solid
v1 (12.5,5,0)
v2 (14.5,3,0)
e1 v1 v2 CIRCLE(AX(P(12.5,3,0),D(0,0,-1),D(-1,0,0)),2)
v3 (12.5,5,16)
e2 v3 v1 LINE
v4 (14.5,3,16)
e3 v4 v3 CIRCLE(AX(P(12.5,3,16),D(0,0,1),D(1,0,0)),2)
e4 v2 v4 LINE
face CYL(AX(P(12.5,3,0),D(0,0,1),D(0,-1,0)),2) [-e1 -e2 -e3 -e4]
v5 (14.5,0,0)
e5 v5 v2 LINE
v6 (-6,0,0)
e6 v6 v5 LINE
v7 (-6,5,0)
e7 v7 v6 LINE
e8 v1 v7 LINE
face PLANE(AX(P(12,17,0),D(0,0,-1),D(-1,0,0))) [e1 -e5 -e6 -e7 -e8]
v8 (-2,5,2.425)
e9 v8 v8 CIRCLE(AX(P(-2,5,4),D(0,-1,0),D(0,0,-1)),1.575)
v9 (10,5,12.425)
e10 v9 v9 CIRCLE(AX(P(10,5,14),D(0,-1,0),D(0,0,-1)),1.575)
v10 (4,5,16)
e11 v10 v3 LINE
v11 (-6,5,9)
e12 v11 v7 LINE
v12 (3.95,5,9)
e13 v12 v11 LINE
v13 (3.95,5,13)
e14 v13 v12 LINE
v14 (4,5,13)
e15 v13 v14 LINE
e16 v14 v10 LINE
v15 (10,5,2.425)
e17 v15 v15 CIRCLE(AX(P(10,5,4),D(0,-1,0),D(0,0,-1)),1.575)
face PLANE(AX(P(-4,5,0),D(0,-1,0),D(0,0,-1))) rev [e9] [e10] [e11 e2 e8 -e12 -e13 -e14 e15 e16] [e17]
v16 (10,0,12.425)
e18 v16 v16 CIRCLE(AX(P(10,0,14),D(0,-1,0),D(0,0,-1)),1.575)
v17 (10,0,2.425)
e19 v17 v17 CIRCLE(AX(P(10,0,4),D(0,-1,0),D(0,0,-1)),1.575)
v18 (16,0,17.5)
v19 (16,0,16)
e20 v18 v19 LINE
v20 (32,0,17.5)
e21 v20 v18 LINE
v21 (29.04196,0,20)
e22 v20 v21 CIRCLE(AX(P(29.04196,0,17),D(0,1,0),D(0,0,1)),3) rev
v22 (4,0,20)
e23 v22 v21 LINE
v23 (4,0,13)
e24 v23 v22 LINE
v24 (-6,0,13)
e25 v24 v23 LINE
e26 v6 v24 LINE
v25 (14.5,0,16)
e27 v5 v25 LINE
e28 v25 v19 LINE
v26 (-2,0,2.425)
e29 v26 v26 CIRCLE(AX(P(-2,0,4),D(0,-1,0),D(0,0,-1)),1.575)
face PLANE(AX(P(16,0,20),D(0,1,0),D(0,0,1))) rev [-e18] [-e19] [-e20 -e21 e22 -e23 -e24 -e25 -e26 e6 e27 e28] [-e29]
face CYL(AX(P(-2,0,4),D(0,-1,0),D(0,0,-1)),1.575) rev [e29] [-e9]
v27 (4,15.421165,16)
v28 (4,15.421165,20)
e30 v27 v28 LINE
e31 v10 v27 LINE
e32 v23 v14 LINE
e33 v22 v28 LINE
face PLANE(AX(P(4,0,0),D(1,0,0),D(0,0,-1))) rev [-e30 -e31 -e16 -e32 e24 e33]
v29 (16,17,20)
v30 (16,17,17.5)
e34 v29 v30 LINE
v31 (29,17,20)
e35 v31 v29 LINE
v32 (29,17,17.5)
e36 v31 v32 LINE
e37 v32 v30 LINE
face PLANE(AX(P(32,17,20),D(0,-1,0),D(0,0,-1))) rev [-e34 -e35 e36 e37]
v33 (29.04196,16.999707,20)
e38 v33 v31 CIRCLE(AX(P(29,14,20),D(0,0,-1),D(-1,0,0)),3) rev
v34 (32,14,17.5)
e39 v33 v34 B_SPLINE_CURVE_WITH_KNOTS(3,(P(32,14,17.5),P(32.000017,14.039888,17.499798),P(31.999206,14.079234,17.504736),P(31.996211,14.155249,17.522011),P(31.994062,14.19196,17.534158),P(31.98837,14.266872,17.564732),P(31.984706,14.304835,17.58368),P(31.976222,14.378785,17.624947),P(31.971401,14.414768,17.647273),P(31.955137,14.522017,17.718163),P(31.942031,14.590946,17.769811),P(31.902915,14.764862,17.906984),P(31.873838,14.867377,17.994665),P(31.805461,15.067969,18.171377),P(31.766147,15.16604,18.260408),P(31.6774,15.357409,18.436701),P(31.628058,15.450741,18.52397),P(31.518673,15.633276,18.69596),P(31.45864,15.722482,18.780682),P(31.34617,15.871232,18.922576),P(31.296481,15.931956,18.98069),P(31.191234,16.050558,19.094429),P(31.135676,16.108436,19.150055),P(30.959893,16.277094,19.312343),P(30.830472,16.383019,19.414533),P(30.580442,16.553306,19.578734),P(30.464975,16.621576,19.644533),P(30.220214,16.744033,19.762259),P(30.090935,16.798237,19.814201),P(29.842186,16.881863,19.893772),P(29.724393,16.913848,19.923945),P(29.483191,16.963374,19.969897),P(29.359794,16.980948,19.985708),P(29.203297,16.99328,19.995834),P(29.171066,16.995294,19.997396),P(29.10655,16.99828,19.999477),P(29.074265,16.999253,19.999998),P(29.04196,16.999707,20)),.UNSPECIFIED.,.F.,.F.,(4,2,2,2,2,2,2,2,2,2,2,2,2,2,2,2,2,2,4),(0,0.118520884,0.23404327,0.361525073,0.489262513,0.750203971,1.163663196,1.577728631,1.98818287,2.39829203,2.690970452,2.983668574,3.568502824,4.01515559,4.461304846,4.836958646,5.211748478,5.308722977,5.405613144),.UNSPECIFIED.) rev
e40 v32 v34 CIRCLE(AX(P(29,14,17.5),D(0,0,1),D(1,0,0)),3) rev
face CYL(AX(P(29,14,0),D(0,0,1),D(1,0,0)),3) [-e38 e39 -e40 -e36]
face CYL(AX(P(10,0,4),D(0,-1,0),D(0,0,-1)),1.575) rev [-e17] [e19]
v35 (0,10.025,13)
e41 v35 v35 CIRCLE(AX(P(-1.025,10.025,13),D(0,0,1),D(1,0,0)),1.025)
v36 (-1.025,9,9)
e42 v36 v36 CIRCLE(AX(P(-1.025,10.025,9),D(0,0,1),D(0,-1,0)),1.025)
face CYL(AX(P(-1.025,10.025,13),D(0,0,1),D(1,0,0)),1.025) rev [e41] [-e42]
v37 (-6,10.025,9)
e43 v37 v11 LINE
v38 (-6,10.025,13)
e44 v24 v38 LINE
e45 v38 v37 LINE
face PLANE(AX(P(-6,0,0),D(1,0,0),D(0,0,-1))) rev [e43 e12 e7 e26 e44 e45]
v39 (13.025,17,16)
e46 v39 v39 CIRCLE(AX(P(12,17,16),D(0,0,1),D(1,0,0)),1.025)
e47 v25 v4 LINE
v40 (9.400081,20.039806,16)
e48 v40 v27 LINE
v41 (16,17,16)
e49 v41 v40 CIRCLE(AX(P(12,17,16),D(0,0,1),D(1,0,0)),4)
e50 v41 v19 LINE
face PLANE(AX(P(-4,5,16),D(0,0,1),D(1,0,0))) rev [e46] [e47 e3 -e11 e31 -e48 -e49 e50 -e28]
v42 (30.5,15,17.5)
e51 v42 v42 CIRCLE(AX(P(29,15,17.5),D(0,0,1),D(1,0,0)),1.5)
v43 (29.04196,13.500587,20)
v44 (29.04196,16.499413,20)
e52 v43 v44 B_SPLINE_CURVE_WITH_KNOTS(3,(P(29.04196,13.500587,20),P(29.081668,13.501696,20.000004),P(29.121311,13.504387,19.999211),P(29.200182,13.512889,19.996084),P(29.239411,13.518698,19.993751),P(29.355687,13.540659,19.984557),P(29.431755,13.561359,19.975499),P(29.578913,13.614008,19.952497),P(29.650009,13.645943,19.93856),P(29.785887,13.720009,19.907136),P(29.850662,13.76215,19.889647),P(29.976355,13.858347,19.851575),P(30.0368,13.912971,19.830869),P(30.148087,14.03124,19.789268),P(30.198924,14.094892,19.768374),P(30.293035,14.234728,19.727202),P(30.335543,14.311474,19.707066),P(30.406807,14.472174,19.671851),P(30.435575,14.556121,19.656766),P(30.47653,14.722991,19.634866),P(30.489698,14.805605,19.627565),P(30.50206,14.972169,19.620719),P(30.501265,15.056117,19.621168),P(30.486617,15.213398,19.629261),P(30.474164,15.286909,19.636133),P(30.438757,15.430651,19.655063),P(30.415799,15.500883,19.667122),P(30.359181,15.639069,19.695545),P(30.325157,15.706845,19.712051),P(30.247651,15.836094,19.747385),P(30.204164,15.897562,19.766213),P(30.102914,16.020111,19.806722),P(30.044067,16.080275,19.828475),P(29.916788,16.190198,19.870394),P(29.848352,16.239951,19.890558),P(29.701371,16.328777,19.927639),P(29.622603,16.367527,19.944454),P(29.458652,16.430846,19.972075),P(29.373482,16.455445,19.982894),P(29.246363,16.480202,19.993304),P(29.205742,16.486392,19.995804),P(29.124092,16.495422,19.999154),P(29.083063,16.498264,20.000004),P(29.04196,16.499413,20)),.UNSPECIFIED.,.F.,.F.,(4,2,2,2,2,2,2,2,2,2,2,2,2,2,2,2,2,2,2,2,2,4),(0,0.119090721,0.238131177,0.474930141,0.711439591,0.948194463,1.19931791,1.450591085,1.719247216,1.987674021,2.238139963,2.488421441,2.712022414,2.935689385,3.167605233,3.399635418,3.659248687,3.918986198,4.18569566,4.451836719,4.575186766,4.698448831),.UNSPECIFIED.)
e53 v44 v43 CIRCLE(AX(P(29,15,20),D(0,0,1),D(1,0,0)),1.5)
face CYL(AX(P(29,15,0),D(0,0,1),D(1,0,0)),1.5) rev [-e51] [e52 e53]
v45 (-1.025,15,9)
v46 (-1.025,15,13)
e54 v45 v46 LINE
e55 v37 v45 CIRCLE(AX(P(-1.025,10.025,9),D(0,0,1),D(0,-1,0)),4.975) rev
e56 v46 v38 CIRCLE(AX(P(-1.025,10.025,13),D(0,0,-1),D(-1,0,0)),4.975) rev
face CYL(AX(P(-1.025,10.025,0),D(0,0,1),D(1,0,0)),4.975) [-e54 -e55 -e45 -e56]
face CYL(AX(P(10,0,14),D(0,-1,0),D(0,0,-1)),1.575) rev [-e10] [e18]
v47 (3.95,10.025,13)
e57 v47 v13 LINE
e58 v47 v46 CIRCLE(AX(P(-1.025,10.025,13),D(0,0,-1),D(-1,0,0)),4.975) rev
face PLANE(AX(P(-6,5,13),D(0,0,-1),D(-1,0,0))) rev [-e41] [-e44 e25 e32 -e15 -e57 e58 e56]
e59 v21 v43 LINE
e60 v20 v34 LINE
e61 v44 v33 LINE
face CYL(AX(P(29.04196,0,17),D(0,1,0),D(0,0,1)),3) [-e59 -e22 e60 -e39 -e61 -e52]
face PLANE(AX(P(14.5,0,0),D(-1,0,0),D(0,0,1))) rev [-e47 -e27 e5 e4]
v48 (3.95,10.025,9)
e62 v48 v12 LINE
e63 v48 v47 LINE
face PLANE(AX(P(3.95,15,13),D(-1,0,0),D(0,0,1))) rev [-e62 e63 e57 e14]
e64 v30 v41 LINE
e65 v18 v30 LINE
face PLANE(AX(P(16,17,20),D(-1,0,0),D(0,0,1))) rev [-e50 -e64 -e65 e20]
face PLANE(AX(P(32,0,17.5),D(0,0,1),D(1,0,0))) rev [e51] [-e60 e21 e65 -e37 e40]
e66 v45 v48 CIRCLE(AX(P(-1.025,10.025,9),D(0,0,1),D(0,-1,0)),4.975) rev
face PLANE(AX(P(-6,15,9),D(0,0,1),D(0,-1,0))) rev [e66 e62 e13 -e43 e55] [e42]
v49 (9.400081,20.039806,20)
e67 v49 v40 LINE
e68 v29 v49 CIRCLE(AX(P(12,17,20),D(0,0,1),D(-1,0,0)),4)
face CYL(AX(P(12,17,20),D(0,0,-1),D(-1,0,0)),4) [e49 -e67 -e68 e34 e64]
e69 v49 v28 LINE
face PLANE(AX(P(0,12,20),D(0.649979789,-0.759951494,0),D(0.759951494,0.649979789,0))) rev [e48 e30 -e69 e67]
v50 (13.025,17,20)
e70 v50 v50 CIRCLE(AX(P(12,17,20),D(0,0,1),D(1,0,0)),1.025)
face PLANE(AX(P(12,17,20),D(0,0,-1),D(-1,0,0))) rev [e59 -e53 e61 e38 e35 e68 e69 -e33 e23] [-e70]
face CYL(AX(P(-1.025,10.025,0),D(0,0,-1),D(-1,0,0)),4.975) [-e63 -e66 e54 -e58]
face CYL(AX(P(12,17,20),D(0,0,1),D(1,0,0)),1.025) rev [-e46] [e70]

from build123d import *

# Parameters (mm, degrees)
RESSALTO_EXTRUS_O1_DEPTH                  = 20
CORTE_EXTRUS_O1_DEPTH                     = 20
CORTE_EXTRUS_O2_DEPTH                     = 34.12099032335839
RESSALTO_EXTRUS_O2_DEPTH                  = 10
FURO_ROSCADO_PARA_CONDU_TE_DE_M3X0_51_D   = 3.15
ESBO_O20_W                                = 9.95
ESBO_O20_H                                = 4.000000000000002
RESSALTO_EXTRUS_O6_DEPTH                  = 10
FILETE3_R                                 = 4.975
BROCA_DE_ROSQUEAR_PARA_TARRAXA_DE_M2_54_D = 2.05
CORTE_EXTRUS_O3_DEPTH                     = 31.199337741083
FILETE5_R                                 = 2
BROCA_DE_ROSQUEAR_PARA_TARRAXA_DE_M2_55_D = 2.05
ESBO_O30_W                                = 2.5
ESBO_O30_H                                = 17
RESSALTO_EXTRUS_O9_DEPTH                  = 16
FILETE12_R                                = 3
ESBO_O31_R                                = 1.5000000000000009
CORTE_EXTRUS_O4_DEPTH                     = 44.18564583747706


# Some blends are built 0.0001 mm under size
with BuildPart() as part:
    # Esboço1 → Ressalto-extrusão1 (new body)
    with BuildSketch(Plane.XY):
        with BuildLine():
            Line((0, 0), (0, 12))
            Line((0, 12), (9.40008084297598, 20.03980597685765))
            ThreePointArc((9.40008084297598, 20.03980597685765), (13.67336836528959, 20.633158173552044), (16, 17))
            Line((16, 17), (16, 4))
            Line((16, 4), (16, 0))
            Line((16, 0), (0, 0))
        make_face()
    extrude(amount=RESSALTO_EXTRUS_O1_DEPTH)

    # Esboço2 → Corte-extrusão1 (cut)
    with BuildSketch(Plane(origin=(16, 0, 0), x_dir=(0, 0, -1), z_dir=(1, 0, 0))):
        Polygon((0, 5), (-16, 4.999999999999997), (-16, 21), (0, 21), align=None)
    extrude(amount=-CORTE_EXTRUS_O1_DEPTH, mode=Mode.SUBTRACT)

    # Esboço3 → Corte-extrusão2 (cut, through all)
    with BuildSketch(Plane.XY.offset(20)):
        Polygon((0, 0), (4, 0), (4, 15.421164609606624), (0, 12), align=None)
    extrude(amount=-CORTE_EXTRUS_O2_DEPTH, mode=Mode.SUBTRACT)

    # Esboço8 → Ressalto-extrusão2 (add)
    with BuildSketch(Plane.ZY.offset(-4)):
        Polygon((0, 5), (13, 4.999999999999998), (13, 0), (0, 0), align=None)
    extrude(amount=RESSALTO_EXTRUS_O2_DEPTH)

    # Furo roscado para conduíte de M3x0.51 (through all)
    with Locations(Plane(origin=(-2, 0, 4), x_dir=(0, 0, -1), z_dir=(0, -1, 0))):
        with Locations((0, 0), (0, 12), (-10, 12)):
            Hole(FURO_ROSCADO_PARA_CONDU_TE_DE_M3X0_51_D / 2)

    # Esboço20 → Ressalto-extrusão6 (add)
    with BuildSketch(Plane(origin=(0, 5, 8.1e-16), x_dir=(1, 0, 0), z_dir=(0, 1, 1.6e-16))):
        with Locations((-1.025, -11)):
            Rectangle(ESBO_O20_W, ESBO_O20_H)
    extrude(amount=RESSALTO_EXTRUS_O6_DEPTH)

    # Filete3
    filete3_edges = [part.edges().sort_by_distance(p)[0] for p in [
        (3.95, 14.999999999999998, 11.000000000000002),
        (-6, 14.999999999999998, 11.000000000000002),
    ]]
    fillet(filete3_edges, radius=FILETE3_R - 0.0001)  # a hair under: the kernel refuses the full size

    # Broca de rosquear para tarraxa de M2.54 (through all)
    with Locations(Plane.XY.offset(13)):
        with Locations((-1.025, 10.025)):
            Hole(BROCA_DE_ROSQUEAR_PARA_TARRAXA_DE_M2_54_D / 2)

    # Esboço24 → Corte-extrusão3 (cut, through all)
    with BuildSketch(Plane(origin=(0, 5, 8.1e-16), x_dir=(1, 0, 0), z_dir=(0, 1, 1.6e-16))):
        Polygon((16, 8.1e-16), (14.5, -1.8e-16), (14.500000000000002, -15.999999999999996), (16, -15.999999999999996), align=None)
    extrude(amount=-CORTE_EXTRUS_O3_DEPTH, mode=Mode.SUBTRACT)

    # Filete5
    filete5_edges = [part.edges().sort_by_distance(p)[0] for p in [
        (14.5, 4.999999999999999, 7.999999999999999),
    ]]
    fillet(filete5_edges, radius=FILETE5_R)

    # Broca de rosquear para tarraxa de M2.55 (through all)
    with Locations(Plane.XY.offset(20)):
        with Locations((12, 17)):
            Hole(BROCA_DE_ROSQUEAR_PARA_TARRAXA_DE_M2_55_D / 2)

    # Esboço30 → Ressalto-extrusão9 (add)
    with BuildSketch(Plane(origin=(16, 0, 0), x_dir=(0, 0, -1), z_dir=(1, 0, 0))):
        with Locations((-18.75, 8.5)):
            Rectangle(ESBO_O30_W, ESBO_O30_H)
    extrude(amount=RESSALTO_EXTRUS_O9_DEPTH)

    # Filete12
    # the kernel refuses this fillet: 3 mm, written as the material it takes off along each edge
    with BuildSketch(Plane(origin=(32, 17, 10), x_dir=(-1, 0, 0), z_dir=(0, 0, 1))) as filete12_piece_1:
        with BuildLine():
            CenterArc((FILETE12_R, FILETE12_R), FILETE12_R, 180, 90)
            Line((0, FILETE12_R), (-FILETE12_R * 0.02, FILETE12_R))
            Line((-FILETE12_R * 0.02, FILETE12_R), (-FILETE12_R * 0.02, -FILETE12_R * 0.02))
            Line((-FILETE12_R * 0.02, -FILETE12_R * 0.02), (FILETE12_R, -FILETE12_R * 0.02))
            Line((FILETE12_R, -FILETE12_R * 0.02), (FILETE12_R, 0))
        make_face()
    extrude(amount=17.5, mode=Mode.SUBTRACT)
    with BuildSketch(Plane(origin=(32, 24.39509972887527, 20), x_dir=(-1.1653e-13, 0, -1), z_dir=(0, -1, 0))) as filete12_piece_2:
        with BuildLine():
            CenterArc((3.0000000000003446, -2.9580398915497583), FILETE12_R, 99.59406822686617, 80.40593177314054)
            Line((3.447e-13, -2.958039891550108), (-0.05999999999965402, -2.958039891550115))
            Line((-0.05999999999965402, -2.958039891550115), (-0.05999999999999872, -6.99e-15))
            Line((-0.05999999999999872, -6.99e-15), (-6.99e-15, 0.06000000000000227))
            ThreePointArc((-6.99e-15, 0.06000000000000227), (1.250000000000018, 0.06000000000014793), (2.4900000000000446, 0.05916079783099687))
            Line((2.4900000000000446, 0.05916079783099687), (2.5000000000000497, 0))
        make_face()
    extrude(amount=31.79019945775054, mode=Mode.SUBTRACT)

    # Esboço31 → Corte-extrusão4 (cut, through all)
    with BuildSketch(Plane.XY.offset(20)):
        with Locations((29, 15.000000000000002)):
            Circle(ESBO_O31_R)
    extrude(amount=-CORTE_EXTRUS_O4_DEPTH, mode=Mode.SUBTRACT)


solid = part.part
